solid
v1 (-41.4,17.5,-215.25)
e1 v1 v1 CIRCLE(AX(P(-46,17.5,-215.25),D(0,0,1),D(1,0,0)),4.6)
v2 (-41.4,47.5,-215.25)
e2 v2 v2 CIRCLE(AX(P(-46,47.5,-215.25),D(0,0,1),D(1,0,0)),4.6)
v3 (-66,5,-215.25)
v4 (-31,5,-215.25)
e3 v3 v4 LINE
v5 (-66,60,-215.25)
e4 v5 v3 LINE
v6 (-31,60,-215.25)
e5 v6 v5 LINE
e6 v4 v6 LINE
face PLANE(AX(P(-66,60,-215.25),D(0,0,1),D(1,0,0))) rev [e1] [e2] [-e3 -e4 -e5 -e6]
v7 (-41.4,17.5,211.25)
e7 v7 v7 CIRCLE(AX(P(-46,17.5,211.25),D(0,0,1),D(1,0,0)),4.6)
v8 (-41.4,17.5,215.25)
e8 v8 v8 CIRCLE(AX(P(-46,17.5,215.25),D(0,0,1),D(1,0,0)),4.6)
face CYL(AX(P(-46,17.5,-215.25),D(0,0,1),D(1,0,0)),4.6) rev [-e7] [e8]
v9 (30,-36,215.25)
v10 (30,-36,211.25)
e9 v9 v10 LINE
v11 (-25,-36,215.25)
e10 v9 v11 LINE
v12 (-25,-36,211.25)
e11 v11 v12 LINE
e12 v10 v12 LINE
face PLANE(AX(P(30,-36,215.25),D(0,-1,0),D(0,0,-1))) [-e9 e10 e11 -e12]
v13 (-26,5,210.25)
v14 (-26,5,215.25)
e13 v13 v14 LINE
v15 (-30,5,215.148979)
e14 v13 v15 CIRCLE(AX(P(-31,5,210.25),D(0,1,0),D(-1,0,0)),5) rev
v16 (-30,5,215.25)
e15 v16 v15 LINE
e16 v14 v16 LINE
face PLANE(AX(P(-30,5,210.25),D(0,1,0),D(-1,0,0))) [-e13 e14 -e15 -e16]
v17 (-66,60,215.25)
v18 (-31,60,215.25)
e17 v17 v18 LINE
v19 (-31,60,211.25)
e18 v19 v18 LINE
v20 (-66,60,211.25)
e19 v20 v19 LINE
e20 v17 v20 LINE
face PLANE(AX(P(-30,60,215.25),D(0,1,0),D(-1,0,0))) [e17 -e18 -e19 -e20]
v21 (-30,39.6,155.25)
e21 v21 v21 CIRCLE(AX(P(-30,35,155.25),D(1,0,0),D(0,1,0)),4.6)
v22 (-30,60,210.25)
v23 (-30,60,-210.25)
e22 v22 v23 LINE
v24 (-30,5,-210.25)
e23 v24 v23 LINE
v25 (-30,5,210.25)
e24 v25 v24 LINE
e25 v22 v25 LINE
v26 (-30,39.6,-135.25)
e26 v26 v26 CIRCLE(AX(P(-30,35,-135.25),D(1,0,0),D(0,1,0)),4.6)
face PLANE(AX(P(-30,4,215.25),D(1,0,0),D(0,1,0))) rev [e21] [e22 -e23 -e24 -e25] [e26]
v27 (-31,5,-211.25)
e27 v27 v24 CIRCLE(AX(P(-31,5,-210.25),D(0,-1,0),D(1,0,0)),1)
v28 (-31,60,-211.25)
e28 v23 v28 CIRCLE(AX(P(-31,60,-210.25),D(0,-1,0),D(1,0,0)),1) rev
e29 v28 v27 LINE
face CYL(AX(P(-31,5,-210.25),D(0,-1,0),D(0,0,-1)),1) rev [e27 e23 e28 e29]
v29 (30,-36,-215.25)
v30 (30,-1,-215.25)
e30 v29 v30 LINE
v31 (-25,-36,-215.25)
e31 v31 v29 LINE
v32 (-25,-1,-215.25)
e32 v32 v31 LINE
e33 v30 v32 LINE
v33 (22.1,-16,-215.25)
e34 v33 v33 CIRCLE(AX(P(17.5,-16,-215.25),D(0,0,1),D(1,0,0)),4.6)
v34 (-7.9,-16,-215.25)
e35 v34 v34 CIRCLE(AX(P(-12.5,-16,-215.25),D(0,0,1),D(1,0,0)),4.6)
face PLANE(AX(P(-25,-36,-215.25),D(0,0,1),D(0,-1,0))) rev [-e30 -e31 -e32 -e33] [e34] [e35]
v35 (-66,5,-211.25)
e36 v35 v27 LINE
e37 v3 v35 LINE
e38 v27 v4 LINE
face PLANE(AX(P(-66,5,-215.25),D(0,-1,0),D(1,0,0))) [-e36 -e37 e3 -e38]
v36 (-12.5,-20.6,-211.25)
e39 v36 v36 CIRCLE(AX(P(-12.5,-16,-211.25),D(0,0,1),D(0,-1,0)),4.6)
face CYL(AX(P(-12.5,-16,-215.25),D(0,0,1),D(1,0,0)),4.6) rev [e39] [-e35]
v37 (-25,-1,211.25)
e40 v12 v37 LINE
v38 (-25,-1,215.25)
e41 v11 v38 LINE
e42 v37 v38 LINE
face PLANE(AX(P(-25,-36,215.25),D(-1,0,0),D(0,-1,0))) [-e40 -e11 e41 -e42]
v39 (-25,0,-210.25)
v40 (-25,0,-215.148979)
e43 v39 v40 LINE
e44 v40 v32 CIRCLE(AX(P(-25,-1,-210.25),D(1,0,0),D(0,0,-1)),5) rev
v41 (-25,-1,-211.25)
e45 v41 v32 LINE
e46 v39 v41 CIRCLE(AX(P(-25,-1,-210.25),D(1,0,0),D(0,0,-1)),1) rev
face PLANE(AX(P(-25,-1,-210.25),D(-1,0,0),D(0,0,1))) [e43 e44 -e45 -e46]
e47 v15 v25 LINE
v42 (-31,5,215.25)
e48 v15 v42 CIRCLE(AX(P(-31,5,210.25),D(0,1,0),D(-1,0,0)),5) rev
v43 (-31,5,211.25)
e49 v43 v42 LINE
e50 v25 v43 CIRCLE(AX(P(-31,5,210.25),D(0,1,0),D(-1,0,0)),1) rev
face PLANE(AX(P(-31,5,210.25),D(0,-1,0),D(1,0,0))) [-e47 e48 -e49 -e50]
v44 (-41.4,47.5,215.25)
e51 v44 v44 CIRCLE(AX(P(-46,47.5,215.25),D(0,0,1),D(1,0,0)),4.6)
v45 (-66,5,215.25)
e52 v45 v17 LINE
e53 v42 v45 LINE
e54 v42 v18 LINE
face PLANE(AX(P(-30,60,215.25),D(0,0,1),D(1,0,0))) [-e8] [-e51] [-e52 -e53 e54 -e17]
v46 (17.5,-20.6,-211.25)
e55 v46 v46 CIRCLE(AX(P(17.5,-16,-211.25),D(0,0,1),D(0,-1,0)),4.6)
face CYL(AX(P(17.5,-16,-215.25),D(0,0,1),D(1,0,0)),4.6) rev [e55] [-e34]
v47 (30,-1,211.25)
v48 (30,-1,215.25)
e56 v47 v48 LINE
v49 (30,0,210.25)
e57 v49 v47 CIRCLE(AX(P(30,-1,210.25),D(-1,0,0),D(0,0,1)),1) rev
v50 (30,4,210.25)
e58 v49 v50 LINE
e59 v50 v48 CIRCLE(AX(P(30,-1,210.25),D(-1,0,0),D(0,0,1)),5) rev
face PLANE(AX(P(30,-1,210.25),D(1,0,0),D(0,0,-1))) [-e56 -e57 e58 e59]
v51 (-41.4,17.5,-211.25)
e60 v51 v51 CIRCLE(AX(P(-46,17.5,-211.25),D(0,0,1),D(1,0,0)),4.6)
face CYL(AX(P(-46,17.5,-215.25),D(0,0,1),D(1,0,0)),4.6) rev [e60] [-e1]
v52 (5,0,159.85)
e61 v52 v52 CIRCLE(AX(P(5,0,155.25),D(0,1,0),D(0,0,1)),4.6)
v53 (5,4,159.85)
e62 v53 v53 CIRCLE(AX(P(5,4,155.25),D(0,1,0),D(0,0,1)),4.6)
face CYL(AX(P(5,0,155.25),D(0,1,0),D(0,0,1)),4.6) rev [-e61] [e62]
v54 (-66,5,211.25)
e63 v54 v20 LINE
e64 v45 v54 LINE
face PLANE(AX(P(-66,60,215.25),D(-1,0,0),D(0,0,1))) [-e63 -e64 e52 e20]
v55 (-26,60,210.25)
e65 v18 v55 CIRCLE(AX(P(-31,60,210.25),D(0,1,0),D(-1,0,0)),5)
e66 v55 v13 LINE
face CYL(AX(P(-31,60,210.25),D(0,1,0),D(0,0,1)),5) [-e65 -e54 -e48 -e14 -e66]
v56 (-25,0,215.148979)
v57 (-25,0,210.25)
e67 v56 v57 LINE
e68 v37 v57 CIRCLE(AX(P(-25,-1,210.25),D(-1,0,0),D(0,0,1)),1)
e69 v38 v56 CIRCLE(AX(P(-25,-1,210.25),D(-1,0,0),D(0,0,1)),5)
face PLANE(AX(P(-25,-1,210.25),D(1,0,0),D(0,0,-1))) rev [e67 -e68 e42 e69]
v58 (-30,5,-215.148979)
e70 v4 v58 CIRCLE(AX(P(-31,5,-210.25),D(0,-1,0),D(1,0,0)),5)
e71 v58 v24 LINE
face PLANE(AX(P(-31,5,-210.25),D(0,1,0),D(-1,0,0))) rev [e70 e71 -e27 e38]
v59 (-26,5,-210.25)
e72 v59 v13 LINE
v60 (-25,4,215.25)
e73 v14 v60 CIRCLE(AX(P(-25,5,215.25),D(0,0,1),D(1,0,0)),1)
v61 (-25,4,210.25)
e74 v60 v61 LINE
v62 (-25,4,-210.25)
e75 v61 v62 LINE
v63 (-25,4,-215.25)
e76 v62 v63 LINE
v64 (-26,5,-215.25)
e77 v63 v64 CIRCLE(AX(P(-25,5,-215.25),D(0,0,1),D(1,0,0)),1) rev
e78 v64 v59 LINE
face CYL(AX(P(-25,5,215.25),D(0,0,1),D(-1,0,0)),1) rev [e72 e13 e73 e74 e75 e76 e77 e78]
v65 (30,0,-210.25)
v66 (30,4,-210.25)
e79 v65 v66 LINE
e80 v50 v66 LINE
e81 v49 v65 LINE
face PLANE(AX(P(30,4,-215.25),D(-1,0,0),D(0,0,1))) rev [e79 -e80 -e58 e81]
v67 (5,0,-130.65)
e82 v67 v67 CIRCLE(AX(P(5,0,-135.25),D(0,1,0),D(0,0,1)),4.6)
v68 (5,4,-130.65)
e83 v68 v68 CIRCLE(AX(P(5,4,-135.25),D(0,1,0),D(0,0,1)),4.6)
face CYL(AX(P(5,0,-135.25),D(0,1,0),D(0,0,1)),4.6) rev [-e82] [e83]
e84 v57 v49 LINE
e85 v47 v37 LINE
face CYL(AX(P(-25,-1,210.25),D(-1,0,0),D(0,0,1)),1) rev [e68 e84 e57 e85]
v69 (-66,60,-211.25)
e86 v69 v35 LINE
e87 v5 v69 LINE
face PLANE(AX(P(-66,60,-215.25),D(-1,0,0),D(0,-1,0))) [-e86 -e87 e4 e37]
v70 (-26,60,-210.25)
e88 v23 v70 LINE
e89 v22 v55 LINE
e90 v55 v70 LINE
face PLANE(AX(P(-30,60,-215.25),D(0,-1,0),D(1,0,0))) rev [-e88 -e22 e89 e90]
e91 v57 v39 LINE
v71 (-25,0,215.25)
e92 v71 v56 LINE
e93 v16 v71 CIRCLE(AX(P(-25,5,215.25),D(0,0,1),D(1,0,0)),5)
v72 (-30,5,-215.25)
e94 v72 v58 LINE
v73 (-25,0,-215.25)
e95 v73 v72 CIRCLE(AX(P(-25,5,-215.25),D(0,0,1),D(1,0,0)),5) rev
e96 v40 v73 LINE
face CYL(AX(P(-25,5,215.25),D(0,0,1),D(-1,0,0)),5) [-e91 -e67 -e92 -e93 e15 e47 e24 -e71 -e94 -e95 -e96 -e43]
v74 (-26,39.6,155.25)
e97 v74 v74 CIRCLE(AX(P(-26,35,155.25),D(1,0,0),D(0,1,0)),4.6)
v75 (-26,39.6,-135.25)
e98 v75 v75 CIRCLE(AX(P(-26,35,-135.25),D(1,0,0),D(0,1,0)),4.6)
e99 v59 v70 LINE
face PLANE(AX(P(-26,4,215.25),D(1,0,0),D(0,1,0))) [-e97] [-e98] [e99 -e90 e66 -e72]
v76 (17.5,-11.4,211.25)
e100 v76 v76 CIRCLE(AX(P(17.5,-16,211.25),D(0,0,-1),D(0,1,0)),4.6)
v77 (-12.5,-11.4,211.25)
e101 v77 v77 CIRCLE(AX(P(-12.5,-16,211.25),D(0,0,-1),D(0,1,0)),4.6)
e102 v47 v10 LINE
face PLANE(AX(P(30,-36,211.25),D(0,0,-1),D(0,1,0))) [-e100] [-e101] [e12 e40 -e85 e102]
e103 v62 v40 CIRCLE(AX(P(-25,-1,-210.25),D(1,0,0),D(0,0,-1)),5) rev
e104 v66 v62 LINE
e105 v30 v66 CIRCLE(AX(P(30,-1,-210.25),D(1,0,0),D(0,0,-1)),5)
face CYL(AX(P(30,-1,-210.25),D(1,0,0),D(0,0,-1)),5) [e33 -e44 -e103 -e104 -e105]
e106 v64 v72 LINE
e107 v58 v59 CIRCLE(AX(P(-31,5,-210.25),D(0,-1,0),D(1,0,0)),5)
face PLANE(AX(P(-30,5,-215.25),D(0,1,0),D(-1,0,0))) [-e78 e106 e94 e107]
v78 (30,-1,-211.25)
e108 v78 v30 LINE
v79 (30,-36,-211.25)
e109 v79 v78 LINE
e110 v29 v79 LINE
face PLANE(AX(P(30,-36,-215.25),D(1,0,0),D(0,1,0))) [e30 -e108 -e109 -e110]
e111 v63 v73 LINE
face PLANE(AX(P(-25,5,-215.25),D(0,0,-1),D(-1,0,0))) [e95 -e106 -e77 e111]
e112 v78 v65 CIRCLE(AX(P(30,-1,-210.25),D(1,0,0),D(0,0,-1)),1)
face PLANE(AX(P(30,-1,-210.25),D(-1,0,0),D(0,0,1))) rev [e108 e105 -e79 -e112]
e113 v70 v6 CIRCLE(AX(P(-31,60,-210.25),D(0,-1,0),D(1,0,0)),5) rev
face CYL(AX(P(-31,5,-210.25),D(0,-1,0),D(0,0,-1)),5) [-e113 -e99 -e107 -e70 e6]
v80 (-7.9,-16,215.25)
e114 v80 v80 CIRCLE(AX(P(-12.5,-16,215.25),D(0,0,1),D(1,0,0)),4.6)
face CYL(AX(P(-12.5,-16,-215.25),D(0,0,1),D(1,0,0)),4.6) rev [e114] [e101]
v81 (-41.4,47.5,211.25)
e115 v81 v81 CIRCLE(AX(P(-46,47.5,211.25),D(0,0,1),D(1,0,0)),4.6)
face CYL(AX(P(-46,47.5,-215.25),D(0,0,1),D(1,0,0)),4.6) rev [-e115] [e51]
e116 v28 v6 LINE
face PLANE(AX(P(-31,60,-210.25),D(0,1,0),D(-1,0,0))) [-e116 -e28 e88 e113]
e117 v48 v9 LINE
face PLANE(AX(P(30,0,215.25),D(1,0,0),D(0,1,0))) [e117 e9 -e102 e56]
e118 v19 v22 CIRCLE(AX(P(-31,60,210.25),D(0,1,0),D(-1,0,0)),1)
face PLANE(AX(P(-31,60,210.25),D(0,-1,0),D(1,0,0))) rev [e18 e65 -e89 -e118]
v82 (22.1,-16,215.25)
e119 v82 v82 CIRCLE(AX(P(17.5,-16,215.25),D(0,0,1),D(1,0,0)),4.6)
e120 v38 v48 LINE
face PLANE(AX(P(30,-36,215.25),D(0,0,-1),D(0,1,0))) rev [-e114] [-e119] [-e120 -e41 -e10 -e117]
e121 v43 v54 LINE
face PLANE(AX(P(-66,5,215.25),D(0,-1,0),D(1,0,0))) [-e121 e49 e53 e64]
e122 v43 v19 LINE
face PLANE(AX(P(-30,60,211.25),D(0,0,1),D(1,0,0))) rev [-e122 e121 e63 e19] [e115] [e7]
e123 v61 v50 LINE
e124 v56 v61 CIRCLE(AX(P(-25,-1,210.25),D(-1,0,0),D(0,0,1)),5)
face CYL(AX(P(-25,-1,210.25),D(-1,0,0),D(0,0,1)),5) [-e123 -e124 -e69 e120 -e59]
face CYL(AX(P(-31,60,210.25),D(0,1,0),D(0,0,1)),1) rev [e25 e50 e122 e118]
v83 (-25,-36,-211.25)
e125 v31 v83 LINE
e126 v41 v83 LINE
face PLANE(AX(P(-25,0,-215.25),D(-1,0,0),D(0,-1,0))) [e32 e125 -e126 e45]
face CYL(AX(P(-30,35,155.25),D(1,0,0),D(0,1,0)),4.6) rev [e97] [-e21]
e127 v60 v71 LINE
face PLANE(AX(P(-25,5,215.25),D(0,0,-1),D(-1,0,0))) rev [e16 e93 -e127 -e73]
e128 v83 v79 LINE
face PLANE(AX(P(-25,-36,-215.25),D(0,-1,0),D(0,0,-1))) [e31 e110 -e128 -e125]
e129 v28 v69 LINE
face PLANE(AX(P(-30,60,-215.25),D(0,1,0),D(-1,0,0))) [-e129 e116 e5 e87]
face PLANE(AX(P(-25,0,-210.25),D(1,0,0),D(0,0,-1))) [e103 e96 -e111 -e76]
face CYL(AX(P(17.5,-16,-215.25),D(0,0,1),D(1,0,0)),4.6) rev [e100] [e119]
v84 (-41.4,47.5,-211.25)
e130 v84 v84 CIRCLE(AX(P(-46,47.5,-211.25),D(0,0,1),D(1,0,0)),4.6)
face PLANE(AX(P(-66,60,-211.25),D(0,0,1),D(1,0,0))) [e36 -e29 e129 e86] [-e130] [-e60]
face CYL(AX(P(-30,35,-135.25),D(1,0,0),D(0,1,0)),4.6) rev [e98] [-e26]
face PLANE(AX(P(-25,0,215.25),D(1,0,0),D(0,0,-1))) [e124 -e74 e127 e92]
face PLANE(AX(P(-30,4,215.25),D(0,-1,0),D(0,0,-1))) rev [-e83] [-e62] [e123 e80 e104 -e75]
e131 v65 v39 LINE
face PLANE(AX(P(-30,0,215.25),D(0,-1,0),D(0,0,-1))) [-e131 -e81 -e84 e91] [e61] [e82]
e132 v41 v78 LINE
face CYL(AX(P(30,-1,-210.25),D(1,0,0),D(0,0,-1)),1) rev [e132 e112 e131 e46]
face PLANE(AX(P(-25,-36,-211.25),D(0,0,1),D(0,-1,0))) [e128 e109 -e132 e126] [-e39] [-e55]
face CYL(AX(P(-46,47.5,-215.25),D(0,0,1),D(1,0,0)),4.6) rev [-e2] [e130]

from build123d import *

# Parameters (mm, degrees)
SKETCH1_W                      = 60
SKETCH1_H                      = 430.5
BASE_FLANGE1_DEPTH             = 4
EDGE_FLANGE1_STRIP_W           = 18
EDGE_FLANGE1_STRIP_H           = 4
EDGE_FLANGE1_STRIP_CUT_DEPTH   = 430.5
EDGE_FLANGE1_DEPTH             = 430.5
EDGE_FLANGE2_STRIP_W           = 18
EDGE_FLANGE2_STRIP_H           = 4
EDGE_FLANGE2_STRIP_CUT_DEPTH   = 55
EDGE_FLANGE2_STRIP_2_W         = 18
EDGE_FLANGE2_STRIP_2_H         = 4
EDGE_FLANGE2_STRIP_CUT_2_DEPTH = 55
EDGE_FLANGE2_STRIP_3_W         = 18
EDGE_FLANGE2_STRIP_3_H         = 4
EDGE_FLANGE2_STRIP_CUT_3_DEPTH = 55
EDGE_FLANGE2_STRIP_4_W         = 18
EDGE_FLANGE2_STRIP_4_H         = 4
EDGE_FLANGE2_STRIP_CUT_4_DEPTH = 55
EDGE_FLANGE2_DEPTH             = 55
EDGE_FLANGE2_BEND_DEPTH        = 55
EDGE_FLANGE2_BEND_2_DEPTH      = 55
EDGE_FLANGE2_BEND_3_DEPTH      = 55
SKETCH18_R                     = 4.6
EXTRUDE1_DEPTH                 = 440.643321341
SKETCH19_R                     = 4.6
EXTRUDE2_DEPTH                 = 4
SKETCH20_R                     = 4.6
EXTRUDE3_DEPTH                 = 4


# Sheet-metal steps are written as plain solids
with BuildPart() as part:
    # Sketch1 → Base-Flange1 (new body)
    with BuildSketch(Plane(origin=(0, 0, 0), x_dir=(1, 0, 0), z_dir=(0, 1, 0))):
        Rectangle(SKETCH1_W, SKETCH1_H)
    extrude(amount=BASE_FLANGE1_DEPTH)

    # Edge-Flange1 strip (across the edge) → Edge-Flange1 strip cut (cut)
    with BuildSketch(Plane(origin=(-30, 4, -215.25), x_dir=(1, 0, 0), z_dir=(0, 0, 1))):
        with Locations((-4, -2)):
            Rectangle(EDGE_FLANGE1_STRIP_W, EDGE_FLANGE1_STRIP_H)
    extrude(amount=EDGE_FLANGE1_STRIP_CUT_DEPTH, mode=Mode.SUBTRACT)

    # Edge-Flange1 section (across the edge) → Edge-Flange1 (add)
    with BuildSketch(Plane(origin=(-30, 4, -215.25), x_dir=(1, 0, 0), z_dir=(0, 0, 1))):
        with BuildLine():
            Line((0, 1), (0, 56))
            Line((0, 56), (4, 56))
            Line((4, 56), (4, 1))
            ThreePointArc((4, 1), (4.292893219, 0.292893219), (5, 0))
            Line((5, 0), (5, -4))
            ThreePointArc((5, -4), (1.464466094, -2.535533906), (0, 1))
        make_face()
    extrude(amount=EDGE_FLANGE1_DEPTH)

    # Edge-Flange2 strip (across the edge) → Edge-Flange2 strip cut (cut)
    with BuildSketch(Plane(origin=(-30, 5, 215.25), x_dir=(0, 0, -1), z_dir=(0, 1, 0))):
        with Locations((-4, -2)):
            Rectangle(EDGE_FLANGE2_STRIP_W, EDGE_FLANGE2_STRIP_H)
    extrude(amount=EDGE_FLANGE2_STRIP_CUT_DEPTH, mode=Mode.SUBTRACT)

    # Edge-Flange2 strip 2 (across the edge) → Edge-Flange2 strip cut 2 (cut)
    with BuildSketch(Plane(origin=(30, 0, 215.25), x_dir=(0, 0, -1), z_dir=(-1, 0, 0))):
        with Locations((-4, -2)):
            Rectangle(EDGE_FLANGE2_STRIP_2_W, EDGE_FLANGE2_STRIP_2_H)
    extrude(amount=EDGE_FLANGE2_STRIP_CUT_2_DEPTH, mode=Mode.SUBTRACT)

    # Edge-Flange2 strip 3 (across the edge) → Edge-Flange2 strip cut 3 (cut)
    with BuildSketch(Plane(origin=(-30, 60, -215.25), x_dir=(0, 0, 1), z_dir=(0, -1, 0))):
        with Locations((-4, -2)):
            Rectangle(EDGE_FLANGE2_STRIP_3_W, EDGE_FLANGE2_STRIP_3_H)
    extrude(amount=EDGE_FLANGE2_STRIP_CUT_3_DEPTH, mode=Mode.SUBTRACT)

    # Edge-Flange2 strip 4 (across the edge) → Edge-Flange2 strip cut 4 (cut)
    with BuildSketch(Plane(origin=(-25, 0, -215.25), x_dir=(0, 0, 1), z_dir=(1, 0, 0))):
        with Locations((-4, -2)):
            Rectangle(EDGE_FLANGE2_STRIP_4_W, EDGE_FLANGE2_STRIP_4_H)
    extrude(amount=EDGE_FLANGE2_STRIP_CUT_4_DEPTH, mode=Mode.SUBTRACT)

    # Edge-Flange2 section (across the edge) → Edge-Flange2 (add)
    with BuildSketch(Plane(origin=(-30, 5, 215.25), x_dir=(0, 0, -1), z_dir=(0, 1, 0))):
        with BuildLine():
            Line((0, 1), (0, 36))
            Line((0, 36), (4, 36))
            Line((4, 36), (4, 1))
            ThreePointArc((4, 1), (4.292893219, 0.292893219), (5, 0))
            Line((5, 0), (5, -4))
            ThreePointArc((5, -4), (1.464466094, -2.535533906), (0, 1))
        make_face()
    extrude(amount=EDGE_FLANGE2_DEPTH)

    # Edge-Flange2 section 2 (across the edge) → Edge-Flange2 bend (add)
    with BuildSketch(Plane(origin=(30, 0, 215.25), x_dir=(0, 0, -1), z_dir=(-1, 0, 0))):
        with BuildLine():
            Line((0, 1), (0, 36))
            Line((0, 36), (4, 36))
            Line((4, 36), (4, 1))
            ThreePointArc((4, 1), (4.292893219, 0.292893219), (5, 0))
            Line((5, 0), (5, -4))
            ThreePointArc((5, -4), (1.464466094, -2.535533906), (0, 1))
        make_face()
    extrude(amount=EDGE_FLANGE2_BEND_DEPTH)

    # Edge-Flange2 section 3 (across the edge) → Edge-Flange2 bend 2 (add)
    with BuildSketch(Plane(origin=(-30, 60, -215.25), x_dir=(0, 0, 1), z_dir=(0, -1, 0))):
        with BuildLine():
            Line((0, 1), (0, 36))
            Line((0, 36), (4, 36))
            Line((4, 36), (4, 1))
            ThreePointArc((4, 1), (4.292893219, 0.292893219), (5, 0))
            Line((5, 0), (5, -4))
            ThreePointArc((5, -4), (1.464466094, -2.535533906), (0, 1))
        make_face()
    extrude(amount=EDGE_FLANGE2_BEND_2_DEPTH)

    # Edge-Flange2 section 4 (across the edge) → Edge-Flange2 bend 3 (add)
    with BuildSketch(Plane(origin=(-25, 0, -215.25), x_dir=(0, 0, 1), z_dir=(1, 0, 0))):
        with BuildLine():
            Line((0, 1), (0, 36))
            Line((0, 36), (4, 36))
            Line((4, 36), (4, 1))
            ThreePointArc((4, 1), (4.292893219, 0.292893219), (5, 0))
            Line((5, 0), (5, -4))
            ThreePointArc((5, -4), (1.464466094, -2.535533906), (0, 1))
        make_face()
    extrude(amount=EDGE_FLANGE2_BEND_3_DEPTH)

    # Sketch18 → Extrude1 (cut, through all)
    with BuildSketch(Plane.XY.offset(215.25)):
        with Locations((-46, 47.5)):
            Circle(SKETCH18_R)
        with Locations((-46, 17.5)):
            Circle(SKETCH18_R)
        with Locations((-12.5, -16)):
            Circle(SKETCH18_R)
        with Locations((17.5, -16)):
            Circle(SKETCH18_R)
    extrude(amount=-EXTRUDE1_DEPTH, mode=Mode.SUBTRACT)

    # Sketch19 → Extrude2 (cut)
    with BuildSketch(Plane(origin=(-26, 0, 0), x_dir=(0, 0, -1), z_dir=(1, 0, 0))):
        with Locations(Location((-155.25, 35, 0), (0, 0, 90))):
            Circle(SKETCH19_R)
        with Locations(Location((135.25, 35, 0), (0, 0, 90))):
            Circle(SKETCH19_R)
    extrude(amount=-EXTRUDE2_DEPTH, mode=Mode.SUBTRACT)

    # Sketch20 → Extrude3 (cut)
    with BuildSketch(Plane(origin=(0, 4, 0), x_dir=(1, 0, 0), z_dir=(0, 1, 0))):
        with Locations(Location((5, 135.25, 0), (0, 0, 270))):
            Circle(SKETCH20_R)
        with Locations(Location((5, -155.25, 0), (0, 0, 270))):
            Circle(SKETCH20_R)
    extrude(amount=-EXTRUDE3_DEPTH, mode=Mode.SUBTRACT)


solid = part.part
